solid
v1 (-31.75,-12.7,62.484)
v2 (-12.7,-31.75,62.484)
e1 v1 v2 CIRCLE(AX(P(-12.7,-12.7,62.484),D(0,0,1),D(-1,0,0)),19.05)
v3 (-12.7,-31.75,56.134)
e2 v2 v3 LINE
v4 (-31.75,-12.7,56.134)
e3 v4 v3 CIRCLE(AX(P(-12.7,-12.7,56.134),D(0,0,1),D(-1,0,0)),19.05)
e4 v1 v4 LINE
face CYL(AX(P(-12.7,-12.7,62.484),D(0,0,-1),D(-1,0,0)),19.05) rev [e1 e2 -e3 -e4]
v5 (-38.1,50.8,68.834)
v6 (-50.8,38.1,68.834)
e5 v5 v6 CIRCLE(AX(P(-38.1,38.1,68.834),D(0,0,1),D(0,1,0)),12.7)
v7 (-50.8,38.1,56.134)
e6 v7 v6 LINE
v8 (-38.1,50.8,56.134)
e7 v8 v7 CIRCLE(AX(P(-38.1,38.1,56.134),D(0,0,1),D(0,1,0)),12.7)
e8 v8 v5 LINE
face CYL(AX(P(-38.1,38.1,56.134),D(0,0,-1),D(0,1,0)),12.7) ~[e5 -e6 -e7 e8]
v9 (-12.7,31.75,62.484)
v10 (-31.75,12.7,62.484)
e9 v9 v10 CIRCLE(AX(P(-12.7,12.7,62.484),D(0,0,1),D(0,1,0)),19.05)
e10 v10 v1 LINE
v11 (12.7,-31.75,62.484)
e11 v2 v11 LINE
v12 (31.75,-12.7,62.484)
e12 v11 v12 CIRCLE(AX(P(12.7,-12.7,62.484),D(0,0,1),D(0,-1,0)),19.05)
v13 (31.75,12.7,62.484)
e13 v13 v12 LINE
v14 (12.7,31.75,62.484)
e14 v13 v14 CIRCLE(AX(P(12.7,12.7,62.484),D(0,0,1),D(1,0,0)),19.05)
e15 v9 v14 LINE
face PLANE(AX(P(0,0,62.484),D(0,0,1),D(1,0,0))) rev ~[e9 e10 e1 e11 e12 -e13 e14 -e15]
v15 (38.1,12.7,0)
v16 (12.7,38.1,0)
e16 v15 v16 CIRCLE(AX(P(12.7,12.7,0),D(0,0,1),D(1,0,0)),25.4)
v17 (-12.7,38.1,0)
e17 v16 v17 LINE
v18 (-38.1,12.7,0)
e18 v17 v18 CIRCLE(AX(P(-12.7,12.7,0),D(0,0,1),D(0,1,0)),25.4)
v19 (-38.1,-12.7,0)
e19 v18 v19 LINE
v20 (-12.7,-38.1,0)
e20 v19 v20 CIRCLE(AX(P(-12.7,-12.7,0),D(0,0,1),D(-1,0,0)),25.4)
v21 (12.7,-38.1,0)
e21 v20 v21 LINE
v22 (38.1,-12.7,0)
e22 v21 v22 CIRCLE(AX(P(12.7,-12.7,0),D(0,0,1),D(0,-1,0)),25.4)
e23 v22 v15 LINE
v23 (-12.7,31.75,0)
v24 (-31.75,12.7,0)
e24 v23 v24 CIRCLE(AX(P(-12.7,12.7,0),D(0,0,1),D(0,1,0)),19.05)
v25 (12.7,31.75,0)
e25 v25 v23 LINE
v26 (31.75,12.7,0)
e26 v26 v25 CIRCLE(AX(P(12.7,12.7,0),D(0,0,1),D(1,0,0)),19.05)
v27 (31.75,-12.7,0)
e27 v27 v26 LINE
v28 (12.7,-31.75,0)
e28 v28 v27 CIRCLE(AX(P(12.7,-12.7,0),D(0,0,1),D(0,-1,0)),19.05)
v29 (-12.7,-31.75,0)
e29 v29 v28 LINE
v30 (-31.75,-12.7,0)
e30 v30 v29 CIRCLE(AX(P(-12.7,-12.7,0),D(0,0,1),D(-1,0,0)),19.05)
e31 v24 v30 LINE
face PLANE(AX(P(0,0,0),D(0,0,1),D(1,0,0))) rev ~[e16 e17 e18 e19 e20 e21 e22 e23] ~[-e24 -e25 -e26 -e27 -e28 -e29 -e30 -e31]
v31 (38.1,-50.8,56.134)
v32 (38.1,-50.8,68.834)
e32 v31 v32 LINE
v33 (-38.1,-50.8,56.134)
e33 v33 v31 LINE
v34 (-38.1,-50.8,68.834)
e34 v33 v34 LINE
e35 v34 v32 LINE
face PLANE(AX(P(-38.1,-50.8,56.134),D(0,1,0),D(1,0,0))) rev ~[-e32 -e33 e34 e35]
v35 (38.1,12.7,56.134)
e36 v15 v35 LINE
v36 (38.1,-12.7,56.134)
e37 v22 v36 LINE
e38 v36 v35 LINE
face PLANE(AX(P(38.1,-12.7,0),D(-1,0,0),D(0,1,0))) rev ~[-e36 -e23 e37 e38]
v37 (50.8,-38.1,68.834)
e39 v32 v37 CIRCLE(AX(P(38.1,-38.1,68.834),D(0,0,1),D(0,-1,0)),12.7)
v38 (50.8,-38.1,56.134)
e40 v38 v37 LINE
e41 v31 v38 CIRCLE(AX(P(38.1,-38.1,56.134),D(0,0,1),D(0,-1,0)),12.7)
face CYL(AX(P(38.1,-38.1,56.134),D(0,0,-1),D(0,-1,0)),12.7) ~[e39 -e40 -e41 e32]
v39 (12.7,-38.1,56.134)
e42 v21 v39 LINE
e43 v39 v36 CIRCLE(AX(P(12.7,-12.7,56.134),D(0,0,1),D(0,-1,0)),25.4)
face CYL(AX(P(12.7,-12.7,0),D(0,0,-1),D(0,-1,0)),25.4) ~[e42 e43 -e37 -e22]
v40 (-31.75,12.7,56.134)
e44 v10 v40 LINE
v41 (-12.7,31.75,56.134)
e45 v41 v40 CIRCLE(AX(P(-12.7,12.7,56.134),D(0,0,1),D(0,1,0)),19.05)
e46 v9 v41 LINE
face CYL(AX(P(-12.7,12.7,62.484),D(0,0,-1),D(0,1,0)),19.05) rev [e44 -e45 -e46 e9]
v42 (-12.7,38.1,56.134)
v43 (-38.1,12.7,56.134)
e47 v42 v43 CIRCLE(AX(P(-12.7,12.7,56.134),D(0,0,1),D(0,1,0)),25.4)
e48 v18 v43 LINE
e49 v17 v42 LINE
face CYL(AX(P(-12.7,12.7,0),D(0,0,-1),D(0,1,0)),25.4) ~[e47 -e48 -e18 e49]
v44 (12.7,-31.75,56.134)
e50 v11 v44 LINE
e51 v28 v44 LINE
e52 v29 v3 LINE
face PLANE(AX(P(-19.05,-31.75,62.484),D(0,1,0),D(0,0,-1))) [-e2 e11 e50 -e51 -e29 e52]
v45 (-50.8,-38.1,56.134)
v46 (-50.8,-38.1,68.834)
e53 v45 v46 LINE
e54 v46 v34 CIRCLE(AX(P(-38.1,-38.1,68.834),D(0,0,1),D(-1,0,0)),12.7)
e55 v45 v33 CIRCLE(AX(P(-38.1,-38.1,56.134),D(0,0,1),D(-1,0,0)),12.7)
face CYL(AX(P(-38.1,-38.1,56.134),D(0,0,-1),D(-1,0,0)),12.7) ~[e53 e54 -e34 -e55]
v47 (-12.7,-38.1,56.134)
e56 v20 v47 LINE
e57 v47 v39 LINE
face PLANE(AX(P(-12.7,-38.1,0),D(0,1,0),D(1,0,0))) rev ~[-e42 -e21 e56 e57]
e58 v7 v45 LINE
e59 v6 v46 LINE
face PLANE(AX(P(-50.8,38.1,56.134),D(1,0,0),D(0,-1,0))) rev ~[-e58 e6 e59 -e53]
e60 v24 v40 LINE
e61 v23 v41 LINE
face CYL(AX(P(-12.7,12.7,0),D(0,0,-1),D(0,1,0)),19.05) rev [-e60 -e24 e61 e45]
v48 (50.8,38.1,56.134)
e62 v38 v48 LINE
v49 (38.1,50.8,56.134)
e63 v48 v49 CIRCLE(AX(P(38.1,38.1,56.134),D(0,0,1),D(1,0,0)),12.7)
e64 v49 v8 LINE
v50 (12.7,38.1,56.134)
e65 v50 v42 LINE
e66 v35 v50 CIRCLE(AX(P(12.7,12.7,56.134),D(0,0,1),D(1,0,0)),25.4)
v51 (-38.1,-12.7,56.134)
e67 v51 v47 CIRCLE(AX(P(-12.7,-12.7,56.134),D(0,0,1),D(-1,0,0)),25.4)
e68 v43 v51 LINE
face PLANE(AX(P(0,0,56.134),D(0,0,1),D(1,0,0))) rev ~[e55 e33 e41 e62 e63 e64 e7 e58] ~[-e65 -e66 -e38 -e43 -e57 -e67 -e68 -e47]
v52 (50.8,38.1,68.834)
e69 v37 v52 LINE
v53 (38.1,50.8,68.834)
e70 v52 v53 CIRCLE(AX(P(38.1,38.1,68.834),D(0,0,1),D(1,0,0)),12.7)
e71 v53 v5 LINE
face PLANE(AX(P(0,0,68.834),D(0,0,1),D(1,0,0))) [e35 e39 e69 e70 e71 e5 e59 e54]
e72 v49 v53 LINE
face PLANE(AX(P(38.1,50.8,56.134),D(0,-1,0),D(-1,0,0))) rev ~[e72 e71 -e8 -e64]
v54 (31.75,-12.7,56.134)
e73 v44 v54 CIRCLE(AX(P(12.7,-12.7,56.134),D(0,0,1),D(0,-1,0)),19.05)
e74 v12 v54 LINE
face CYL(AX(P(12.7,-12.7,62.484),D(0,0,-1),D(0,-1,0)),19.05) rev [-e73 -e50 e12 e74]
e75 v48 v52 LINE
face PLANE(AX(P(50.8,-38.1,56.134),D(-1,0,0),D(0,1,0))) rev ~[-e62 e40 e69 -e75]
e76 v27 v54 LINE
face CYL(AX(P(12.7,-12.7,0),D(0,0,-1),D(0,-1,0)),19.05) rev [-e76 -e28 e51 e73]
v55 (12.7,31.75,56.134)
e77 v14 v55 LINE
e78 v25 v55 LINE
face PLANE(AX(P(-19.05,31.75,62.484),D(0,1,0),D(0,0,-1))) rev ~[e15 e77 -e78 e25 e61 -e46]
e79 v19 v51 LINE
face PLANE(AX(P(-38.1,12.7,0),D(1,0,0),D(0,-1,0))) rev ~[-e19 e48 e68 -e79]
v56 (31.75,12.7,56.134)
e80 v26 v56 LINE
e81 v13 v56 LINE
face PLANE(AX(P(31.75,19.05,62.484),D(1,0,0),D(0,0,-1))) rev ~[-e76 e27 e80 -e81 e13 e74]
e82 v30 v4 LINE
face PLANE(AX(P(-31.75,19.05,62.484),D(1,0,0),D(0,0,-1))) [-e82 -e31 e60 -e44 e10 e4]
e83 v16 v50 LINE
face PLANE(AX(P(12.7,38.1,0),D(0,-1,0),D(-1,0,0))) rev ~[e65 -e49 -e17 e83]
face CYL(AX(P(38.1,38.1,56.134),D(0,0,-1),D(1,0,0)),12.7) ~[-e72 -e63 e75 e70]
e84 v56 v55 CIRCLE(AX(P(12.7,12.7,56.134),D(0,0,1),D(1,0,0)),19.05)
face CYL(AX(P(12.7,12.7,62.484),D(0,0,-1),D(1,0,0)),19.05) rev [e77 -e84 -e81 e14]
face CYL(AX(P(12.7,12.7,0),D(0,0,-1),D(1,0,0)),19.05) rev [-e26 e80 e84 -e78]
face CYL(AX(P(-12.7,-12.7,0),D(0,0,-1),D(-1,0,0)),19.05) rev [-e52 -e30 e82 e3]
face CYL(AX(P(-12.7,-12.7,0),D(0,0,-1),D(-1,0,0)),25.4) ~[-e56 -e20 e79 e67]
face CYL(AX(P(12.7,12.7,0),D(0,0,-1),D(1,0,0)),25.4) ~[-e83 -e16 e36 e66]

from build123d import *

# Parameters (mm, degrees)
F1_DEPTH     = 56.134
F3_DEPTH     = 12.7
F4_T         = 6.35
F4_T3_DEPTH  = 38.1
F4_T5_DEPTH  = 38.1
F4_T8_ANGLE  = 90.000000001
F4_T10_ANGLE = 90.000000001
F4_T12_ANGLE = 90.000000001
F4_T14_ANGLE = 90.000000001


# Not quite as in the source:
# - a shell that OpenCascade refuses in one call is made with other operations: the cavity is built on its own and cut out


with BuildPart() as f1:
    # F0 (on Top) → F1 (new body)
    with BuildSketch(Plane.XY):
        with BuildLine():
            ThreePointArc((-38.1, -12.7), (-30.6605122421, -30.6605122421), (-12.7, -38.1))
            Line((-12.7, -38.1), (12.7, -38.1))
            ThreePointArc((12.7, -38.1), (30.6605122421, -30.6605122421), (38.1, -12.7))
            Line((38.1, -12.7), (38.1, 12.7))
            ThreePointArc((38.1, 12.7), (30.6605122421, 30.6605122421), (12.7, 38.1))
            Line((12.7, 38.1), (-12.7, 38.1))
            ThreePointArc((-12.7, 38.1), (-30.6605122421, 30.6605122421), (-38.1, 12.7))
            Line((-38.1, 12.7), (-38.1, -12.7))
        make_face()
    extrude(amount=F1_DEPTH)

    # F2 (on face) → F3 (join)
    with BuildSketch(Plane.XY.offset(56.134)):
        with BuildLine():
            ThreePointArc((-50.8, -38.1), (-47.0802561211, -47.0802561211), (-38.1, -50.8))
            Line((-38.1, -50.8), (38.1, -50.8))
            ThreePointArc((38.1, -50.8), (47.0802561211, -47.0802561211), (50.8, -38.1))
            Line((50.8, -38.1), (50.8, 38.1))
            ThreePointArc((50.8, 38.1), (47.0802561211, 47.0802561211), (38.1, 50.8))
            Line((38.1, 50.8), (-38.1, 50.8))
            ThreePointArc((-38.1, 50.8), (-47.0802561211, 47.0802561211), (-50.8, 38.1))
            Line((-50.8, 38.1), (-50.8, -38.1))
        make_face()
    extrude(amount=F3_DEPTH)

    # F4: shell of thickness 6.35, made by hand


with BuildPart() as f4_core1:
    # F4_t2: copy of F1
    add(f1.part)

    # the walls: a layer under each face that stays
    f4_faces = [f4_core1.faces().sort_by_distance(p)[0] for p in [
        (-47.0802561211, -47.0802561211, 62.484),
        (-50.8, 0, 62.484),
        (0, -50.8, 62.484),
        (-33.8666666667, -33.8666666667, 56.134),
        (0, 0, 68.834),
        (-47.0802561211, 47.0802561211, 62.484),
        (47.0802561211, -47.0802561211, 62.484),
        (0, 50.8, 62.484),
        (50.8, 0, 62.484),
        (47.0802561211, 47.0802561211, 62.484),
        (-38.1, 0, 28.067),
        (-30.6605122421, -30.6605122421, 28.067),
        (0, -38.1, 28.067),
        (30.6605122421, -30.6605122421, 28.067),
        (38.1, 0, 28.067),
        (30.6605122421, 30.6605122421, 28.067),
        (0, 38.1, 28.067),
        (-30.6605122421, 30.6605122421, 28.067),
    ]]
    thicken(f4_faces, amount=-F4_T, mode=Mode.SUBTRACT)

    # F4_s4 → F4_t3 (cut)
    with BuildSketch(Plane.XZ.offset(-19.05)):
        Polygon((-38.1635, 56.0705), (-38.1, 62.484), (-31.75, 62.484), (-31.75, 56.134), align=None)
        Polygon((38.1635, 56.0705), (38.1, 62.484), (31.75, 62.484), (31.75, 56.134), align=None)
    extrude(amount=F4_T3_DEPTH, mode=Mode.SUBTRACT)

    # F4_s6 → F4_t5 (cut)
    with BuildSketch(Plane.YZ.offset(-19.05)):
        Polygon((-38.1635, 56.0705), (-38.1, 62.484), (-31.75, 62.484), (-31.75, 56.134), align=None)
        Polygon((38.1635, 56.0705), (38.1, 62.484), (31.75, 62.484), (31.75, 56.134), align=None)
    extrude(amount=F4_T5_DEPTH, mode=Mode.SUBTRACT)

    # F4_s7 → F4_t8 (revolve, cut)
    with BuildSketch(Plane.XZ.offset(12.7)):
        Polygon((-38.1635, 56.0705), (-38.1, 62.484), (-31.75, 62.484), (-31.75, 56.134), align=None)
    revolve(axis=Axis((-12.7, -12.7, 56.134), (0, 0, 1)), revolution_arc=F4_T8_ANGLE, mode=Mode.SUBTRACT)

    # F4_s9 → F4_t10 (revolve, cut)
    with BuildSketch(Plane.YZ.offset(12.7)):
        Polygon((-38.1635, 56.0705), (-38.1, 62.484), (-31.75, 62.484), (-31.75, 56.134), align=None)
    revolve(axis=Axis((12.7, -12.7, 56.134), (0, 0, 1)), revolution_arc=F4_T10_ANGLE, mode=Mode.SUBTRACT)

    # F4_s11 → F4_t12 (revolve, cut)
    with BuildSketch(Plane.XZ.offset(-12.7)):
        Polygon((38.1635, 56.0705), (38.1, 62.484), (31.75, 62.484), (31.75, 56.134), align=None)
    revolve(axis=Axis((12.7, 12.7, 56.134), (0, 0, 1)), revolution_arc=F4_T12_ANGLE, mode=Mode.SUBTRACT)

    # F4_s13 → F4_t14 (revolve, cut)
    with BuildSketch(Plane.YZ.offset(-12.7)):
        Polygon((38.1635, 56.0705), (38.1, 62.484), (31.75, 62.484), (31.75, 56.134), align=None)
    revolve(axis=Axis((-12.7, 12.7, 56.134), (0, 0, 1)), revolution_arc=F4_T14_ANGLE, mode=Mode.SUBTRACT)


with BuildPart() as f1_1:
    add(f1.part)

    # what is left inside the walls is the cavity
    f4_cavity = [f4_core1.part.solids().sort_by_distance(p)[0] for p in [
        (0, -10.583333, 62.4205),
    ]]
    add(f4_cavity, mode=Mode.SUBTRACT)


solid = f1_1.part
